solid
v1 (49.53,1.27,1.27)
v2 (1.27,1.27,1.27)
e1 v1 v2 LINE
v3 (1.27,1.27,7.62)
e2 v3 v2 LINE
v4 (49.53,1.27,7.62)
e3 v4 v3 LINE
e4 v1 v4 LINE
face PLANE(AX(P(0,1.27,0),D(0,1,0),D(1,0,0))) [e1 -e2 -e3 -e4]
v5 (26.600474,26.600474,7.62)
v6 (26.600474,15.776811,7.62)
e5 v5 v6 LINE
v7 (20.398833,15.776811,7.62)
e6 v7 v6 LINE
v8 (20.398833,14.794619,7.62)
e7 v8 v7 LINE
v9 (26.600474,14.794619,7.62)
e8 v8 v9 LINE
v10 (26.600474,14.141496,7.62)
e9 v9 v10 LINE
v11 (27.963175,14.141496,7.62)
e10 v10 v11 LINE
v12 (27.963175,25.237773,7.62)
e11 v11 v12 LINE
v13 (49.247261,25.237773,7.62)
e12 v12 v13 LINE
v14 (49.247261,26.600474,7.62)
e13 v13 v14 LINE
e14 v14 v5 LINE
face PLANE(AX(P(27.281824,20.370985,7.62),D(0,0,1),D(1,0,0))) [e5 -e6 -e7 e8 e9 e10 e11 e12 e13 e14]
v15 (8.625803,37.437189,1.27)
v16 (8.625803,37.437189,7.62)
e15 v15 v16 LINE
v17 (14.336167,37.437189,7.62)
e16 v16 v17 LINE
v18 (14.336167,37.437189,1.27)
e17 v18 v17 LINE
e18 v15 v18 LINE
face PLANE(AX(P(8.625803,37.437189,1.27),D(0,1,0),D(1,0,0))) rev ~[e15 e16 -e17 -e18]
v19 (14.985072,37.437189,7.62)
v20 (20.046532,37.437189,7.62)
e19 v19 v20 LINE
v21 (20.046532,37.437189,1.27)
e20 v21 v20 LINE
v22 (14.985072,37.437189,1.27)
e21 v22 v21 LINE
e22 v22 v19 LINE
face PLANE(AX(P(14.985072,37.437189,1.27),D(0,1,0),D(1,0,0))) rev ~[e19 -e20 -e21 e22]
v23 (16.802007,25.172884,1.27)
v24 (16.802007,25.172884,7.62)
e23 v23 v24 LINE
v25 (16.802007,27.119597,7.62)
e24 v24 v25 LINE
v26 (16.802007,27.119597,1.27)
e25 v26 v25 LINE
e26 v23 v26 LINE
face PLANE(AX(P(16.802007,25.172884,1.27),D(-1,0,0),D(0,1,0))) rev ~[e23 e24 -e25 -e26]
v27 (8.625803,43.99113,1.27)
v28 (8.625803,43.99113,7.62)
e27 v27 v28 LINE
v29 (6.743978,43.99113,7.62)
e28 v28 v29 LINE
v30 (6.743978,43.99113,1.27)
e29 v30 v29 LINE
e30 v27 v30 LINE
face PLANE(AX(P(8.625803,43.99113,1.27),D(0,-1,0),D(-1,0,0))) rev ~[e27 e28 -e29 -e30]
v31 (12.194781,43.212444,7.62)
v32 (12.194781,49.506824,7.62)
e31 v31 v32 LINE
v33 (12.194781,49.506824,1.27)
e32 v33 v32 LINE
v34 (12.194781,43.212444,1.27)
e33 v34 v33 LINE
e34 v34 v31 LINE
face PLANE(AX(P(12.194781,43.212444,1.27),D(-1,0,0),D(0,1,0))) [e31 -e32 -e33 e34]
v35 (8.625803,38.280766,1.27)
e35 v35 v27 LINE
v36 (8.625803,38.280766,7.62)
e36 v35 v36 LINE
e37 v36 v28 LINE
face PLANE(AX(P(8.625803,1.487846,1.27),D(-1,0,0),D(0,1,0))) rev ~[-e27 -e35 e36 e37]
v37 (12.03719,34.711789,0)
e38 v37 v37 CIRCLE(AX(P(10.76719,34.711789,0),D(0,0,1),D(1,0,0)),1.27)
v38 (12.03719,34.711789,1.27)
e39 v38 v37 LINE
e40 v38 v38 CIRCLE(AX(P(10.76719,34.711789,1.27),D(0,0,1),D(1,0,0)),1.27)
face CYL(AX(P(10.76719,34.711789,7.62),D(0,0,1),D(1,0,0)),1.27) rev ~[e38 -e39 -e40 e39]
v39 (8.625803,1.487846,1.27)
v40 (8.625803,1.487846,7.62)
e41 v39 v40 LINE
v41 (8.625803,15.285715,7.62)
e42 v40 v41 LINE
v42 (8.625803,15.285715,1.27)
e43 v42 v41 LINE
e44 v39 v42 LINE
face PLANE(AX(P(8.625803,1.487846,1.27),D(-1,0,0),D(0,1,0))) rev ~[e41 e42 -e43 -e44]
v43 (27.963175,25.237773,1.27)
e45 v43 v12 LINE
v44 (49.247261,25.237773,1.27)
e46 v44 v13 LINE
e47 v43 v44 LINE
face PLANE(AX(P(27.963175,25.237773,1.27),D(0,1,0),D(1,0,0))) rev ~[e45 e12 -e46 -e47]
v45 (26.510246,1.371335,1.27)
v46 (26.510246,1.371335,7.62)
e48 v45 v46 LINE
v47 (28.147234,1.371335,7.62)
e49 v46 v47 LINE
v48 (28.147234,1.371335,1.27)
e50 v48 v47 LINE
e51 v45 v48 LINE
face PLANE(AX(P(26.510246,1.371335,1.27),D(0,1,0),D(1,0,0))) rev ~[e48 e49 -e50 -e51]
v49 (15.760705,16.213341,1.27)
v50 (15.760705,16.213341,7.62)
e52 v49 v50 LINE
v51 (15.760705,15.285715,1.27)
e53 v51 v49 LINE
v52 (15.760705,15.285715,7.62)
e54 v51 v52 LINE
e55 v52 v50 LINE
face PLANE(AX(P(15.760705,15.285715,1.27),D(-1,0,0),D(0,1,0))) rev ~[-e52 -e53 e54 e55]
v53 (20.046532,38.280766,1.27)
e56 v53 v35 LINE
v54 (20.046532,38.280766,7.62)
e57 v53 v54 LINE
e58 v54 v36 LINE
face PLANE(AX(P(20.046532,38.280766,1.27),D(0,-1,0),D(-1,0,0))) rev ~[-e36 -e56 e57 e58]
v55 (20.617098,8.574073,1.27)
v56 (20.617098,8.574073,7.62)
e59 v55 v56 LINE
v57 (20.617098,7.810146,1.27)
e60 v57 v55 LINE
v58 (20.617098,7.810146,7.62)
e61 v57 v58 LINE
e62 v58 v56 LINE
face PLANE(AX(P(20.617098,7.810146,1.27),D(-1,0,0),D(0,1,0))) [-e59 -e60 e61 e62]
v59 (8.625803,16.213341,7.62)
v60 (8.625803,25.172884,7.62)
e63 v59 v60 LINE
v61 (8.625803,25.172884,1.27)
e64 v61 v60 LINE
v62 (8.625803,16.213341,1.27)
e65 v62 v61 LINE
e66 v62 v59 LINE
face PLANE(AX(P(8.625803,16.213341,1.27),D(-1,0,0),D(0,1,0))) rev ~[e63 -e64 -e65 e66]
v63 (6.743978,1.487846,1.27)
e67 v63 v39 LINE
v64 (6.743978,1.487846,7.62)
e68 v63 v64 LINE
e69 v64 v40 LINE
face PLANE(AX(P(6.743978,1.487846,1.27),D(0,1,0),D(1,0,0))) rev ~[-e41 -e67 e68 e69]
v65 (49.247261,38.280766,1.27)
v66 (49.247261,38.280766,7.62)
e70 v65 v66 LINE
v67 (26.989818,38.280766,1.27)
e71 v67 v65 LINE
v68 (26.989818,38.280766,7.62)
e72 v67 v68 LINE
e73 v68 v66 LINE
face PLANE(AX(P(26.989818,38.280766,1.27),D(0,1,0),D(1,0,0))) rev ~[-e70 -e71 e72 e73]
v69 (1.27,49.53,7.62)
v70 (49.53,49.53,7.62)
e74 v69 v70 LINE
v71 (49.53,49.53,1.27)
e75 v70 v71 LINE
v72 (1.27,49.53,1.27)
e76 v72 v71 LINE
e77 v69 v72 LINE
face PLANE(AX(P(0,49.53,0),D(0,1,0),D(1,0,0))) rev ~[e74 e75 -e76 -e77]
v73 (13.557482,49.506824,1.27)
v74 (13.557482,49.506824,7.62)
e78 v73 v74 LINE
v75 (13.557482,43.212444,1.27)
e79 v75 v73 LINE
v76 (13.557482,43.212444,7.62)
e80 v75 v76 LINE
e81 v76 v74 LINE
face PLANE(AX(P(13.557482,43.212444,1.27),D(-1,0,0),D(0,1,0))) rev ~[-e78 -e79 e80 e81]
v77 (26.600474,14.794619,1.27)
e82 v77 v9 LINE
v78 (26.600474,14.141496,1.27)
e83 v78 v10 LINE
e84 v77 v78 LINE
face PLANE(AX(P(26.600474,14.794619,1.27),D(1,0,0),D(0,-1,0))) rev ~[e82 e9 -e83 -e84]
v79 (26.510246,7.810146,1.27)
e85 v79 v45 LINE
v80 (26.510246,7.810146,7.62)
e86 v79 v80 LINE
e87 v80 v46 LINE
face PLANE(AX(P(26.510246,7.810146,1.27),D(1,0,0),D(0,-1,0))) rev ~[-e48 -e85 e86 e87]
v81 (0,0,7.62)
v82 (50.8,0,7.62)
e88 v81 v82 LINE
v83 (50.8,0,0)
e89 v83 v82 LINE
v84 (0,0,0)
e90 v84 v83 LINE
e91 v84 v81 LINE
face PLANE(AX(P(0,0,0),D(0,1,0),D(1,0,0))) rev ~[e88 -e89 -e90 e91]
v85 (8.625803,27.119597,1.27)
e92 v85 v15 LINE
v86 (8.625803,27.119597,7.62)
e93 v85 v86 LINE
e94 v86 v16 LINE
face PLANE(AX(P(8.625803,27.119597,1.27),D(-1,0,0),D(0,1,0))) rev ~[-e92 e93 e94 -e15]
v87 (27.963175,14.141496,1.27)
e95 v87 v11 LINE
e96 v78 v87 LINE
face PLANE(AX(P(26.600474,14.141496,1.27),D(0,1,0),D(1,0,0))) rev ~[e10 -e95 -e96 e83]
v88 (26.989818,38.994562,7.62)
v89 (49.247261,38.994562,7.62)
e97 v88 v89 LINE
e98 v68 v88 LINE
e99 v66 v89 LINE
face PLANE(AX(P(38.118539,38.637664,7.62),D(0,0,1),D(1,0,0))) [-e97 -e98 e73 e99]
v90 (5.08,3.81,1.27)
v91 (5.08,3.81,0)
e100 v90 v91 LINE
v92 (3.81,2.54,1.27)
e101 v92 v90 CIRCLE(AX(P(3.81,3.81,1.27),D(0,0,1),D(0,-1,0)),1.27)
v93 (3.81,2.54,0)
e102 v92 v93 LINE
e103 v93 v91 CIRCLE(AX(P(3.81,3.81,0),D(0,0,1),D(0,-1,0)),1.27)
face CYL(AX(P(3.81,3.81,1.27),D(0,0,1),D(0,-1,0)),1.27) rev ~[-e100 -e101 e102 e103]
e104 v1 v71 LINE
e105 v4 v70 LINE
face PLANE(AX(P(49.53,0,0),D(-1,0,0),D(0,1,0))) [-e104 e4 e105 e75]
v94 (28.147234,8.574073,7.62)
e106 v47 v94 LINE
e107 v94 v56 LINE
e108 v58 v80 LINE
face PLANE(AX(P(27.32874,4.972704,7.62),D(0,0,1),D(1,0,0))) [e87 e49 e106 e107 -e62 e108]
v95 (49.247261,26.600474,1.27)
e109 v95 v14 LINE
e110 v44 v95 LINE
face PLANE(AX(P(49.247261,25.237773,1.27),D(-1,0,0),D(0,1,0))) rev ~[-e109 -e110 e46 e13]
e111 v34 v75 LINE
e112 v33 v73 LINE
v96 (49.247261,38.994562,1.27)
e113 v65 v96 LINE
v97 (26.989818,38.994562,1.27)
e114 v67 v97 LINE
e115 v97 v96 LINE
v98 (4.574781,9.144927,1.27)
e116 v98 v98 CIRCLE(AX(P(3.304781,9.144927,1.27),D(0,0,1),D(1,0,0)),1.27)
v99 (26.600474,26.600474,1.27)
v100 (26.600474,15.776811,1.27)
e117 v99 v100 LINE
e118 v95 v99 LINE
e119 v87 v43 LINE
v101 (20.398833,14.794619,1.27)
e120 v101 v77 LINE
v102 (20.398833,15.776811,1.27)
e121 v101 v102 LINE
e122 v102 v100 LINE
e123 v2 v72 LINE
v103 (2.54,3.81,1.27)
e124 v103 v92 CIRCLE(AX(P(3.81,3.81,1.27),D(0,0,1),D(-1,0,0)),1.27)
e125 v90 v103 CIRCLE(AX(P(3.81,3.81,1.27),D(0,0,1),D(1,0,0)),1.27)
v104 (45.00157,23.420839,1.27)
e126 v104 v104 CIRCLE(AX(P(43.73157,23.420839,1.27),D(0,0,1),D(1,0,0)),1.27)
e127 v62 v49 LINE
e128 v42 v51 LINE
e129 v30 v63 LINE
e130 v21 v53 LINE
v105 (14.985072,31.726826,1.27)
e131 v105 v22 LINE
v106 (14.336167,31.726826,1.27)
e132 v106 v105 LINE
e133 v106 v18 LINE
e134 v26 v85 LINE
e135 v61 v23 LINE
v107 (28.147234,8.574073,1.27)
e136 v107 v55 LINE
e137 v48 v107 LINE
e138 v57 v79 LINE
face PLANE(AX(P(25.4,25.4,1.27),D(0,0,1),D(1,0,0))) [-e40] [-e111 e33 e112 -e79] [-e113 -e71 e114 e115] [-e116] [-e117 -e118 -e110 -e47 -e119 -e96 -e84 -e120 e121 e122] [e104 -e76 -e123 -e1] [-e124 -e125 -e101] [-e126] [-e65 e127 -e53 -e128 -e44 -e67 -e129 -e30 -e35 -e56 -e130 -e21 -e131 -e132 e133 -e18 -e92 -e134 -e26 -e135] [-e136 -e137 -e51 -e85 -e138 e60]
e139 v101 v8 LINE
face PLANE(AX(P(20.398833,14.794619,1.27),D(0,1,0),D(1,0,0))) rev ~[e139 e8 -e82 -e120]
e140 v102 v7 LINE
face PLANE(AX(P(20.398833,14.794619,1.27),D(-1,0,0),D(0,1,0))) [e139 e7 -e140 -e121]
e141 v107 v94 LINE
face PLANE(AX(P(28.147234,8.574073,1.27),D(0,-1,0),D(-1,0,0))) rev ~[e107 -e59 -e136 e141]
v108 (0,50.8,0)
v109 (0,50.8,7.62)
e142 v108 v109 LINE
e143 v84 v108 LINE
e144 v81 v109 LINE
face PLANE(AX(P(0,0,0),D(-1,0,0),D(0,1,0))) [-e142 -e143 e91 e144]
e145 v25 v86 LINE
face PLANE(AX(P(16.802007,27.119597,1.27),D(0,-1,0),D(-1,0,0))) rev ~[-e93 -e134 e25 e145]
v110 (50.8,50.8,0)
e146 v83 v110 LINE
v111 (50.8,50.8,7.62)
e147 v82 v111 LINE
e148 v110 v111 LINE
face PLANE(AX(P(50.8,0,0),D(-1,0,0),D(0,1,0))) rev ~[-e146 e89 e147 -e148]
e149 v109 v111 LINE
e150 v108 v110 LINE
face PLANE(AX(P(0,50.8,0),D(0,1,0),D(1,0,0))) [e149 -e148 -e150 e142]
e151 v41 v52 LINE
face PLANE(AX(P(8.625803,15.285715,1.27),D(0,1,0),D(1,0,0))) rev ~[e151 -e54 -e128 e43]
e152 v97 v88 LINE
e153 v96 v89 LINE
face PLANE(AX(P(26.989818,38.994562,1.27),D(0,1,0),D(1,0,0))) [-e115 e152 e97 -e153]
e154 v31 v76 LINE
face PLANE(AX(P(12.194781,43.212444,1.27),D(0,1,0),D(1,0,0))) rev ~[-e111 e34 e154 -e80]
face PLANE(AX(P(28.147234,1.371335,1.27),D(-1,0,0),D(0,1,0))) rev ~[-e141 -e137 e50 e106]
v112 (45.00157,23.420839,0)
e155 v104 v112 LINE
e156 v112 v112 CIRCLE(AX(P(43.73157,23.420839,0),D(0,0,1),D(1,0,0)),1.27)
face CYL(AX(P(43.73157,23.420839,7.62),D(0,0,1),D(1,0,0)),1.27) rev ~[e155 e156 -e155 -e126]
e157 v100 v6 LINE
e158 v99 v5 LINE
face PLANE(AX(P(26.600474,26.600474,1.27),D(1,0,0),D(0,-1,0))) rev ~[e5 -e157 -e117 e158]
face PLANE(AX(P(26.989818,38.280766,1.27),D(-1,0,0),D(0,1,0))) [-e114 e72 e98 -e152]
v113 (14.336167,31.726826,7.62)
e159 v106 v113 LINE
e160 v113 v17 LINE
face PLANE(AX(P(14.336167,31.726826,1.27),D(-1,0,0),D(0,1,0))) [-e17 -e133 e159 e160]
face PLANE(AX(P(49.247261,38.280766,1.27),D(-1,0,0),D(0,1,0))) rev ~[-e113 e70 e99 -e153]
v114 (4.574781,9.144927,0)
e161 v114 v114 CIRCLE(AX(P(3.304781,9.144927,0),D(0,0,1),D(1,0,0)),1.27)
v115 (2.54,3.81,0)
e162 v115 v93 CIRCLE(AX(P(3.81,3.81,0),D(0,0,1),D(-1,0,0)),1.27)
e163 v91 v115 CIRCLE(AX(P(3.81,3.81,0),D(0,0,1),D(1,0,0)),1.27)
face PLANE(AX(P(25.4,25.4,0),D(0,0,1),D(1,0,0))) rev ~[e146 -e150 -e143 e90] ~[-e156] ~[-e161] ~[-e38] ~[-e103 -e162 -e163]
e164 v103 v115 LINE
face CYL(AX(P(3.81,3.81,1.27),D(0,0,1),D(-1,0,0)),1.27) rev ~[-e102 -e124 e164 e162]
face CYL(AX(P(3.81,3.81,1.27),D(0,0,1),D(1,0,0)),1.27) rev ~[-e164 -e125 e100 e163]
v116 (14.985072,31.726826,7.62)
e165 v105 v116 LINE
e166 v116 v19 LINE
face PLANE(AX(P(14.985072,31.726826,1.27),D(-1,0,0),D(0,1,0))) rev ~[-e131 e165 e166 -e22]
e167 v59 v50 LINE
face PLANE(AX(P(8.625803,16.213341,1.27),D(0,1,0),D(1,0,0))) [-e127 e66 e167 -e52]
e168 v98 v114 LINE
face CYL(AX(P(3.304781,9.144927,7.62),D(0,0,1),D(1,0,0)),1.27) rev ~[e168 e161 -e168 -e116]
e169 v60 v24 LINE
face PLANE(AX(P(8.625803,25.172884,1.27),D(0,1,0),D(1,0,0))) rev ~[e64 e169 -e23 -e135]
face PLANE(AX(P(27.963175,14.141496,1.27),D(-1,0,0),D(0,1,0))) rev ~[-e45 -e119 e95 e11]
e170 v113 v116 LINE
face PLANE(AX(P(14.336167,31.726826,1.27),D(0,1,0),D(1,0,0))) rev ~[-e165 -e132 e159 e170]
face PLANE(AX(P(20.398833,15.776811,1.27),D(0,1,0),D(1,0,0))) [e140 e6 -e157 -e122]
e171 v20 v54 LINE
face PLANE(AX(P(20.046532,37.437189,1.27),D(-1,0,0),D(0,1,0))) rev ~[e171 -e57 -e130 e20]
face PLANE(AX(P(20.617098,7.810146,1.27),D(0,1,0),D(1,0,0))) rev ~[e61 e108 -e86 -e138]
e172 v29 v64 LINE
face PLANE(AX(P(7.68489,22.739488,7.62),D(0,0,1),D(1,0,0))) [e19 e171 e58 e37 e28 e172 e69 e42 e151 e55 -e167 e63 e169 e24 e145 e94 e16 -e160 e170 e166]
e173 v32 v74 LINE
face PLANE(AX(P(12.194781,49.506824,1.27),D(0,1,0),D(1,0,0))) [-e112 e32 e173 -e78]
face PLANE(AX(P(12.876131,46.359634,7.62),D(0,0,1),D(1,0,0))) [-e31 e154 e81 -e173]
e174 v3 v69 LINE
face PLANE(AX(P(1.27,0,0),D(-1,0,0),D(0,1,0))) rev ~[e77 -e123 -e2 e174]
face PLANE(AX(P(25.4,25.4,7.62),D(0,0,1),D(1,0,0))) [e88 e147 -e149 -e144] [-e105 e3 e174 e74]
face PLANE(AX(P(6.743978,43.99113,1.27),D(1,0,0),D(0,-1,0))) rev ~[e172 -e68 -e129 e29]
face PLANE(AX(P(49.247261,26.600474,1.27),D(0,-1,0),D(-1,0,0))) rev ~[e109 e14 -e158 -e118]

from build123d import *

# Parameters (mm, degrees)
F0_W      = 50.8
F0_H      = 50.8
F1_DEPTH  = 7.62
F2_T      = -1.27
F4_DEPTH  = 25.4
F5_DEPTH  = 6.35
F6_DEPTH  = 25.4
F8_DEPTH  = 6.35
F7_W      = 7.134902291
F7_H      = 0.9276261553
F7_W_2    = 0.6489050575
F7_H_2    = 5.7103633881
F7_R      = 1.27
F7_W_3    = 1.3627009466
F7_H_3    = 6.2943808734
F7_W_4    = 22.2574435174
F7_H_4    = 0.7137954235
F7_W_5    = 21.2840866297
F7_H_5    = 1.362701878
F7_W_6    = 6.2016416341
F7_H_6    = 0.982192345
F7_W_7    = 5.8931484818
F7_H_7    = 0.7639275864
F9_DEPTH  = 6.35
F10_DEPTH = 25.4
F11_DEPTH = 25.4


# Not quite as in the source:
# - a feature names something its author has since deleted; it is built from what else it names


with BuildPart() as f1:
    # F0 (on Top) → F1 (new body)
    with BuildSketch(Plane.XY):
        with Locations((25.4, 25.4)):
            Rectangle(F0_W, F0_H)
    extrude(amount=F1_DEPTH)

    # F2
    f2_openings = [f1.faces().sort_by_distance(p)[0] for p in [
        (25.4, 25.4, 7.62),
    ]]
    offset(amount=F2_T, openings=f2_openings)

    # F3 (on face) → F4 (cut)
    with BuildSketch(Plane.XY.offset(1.27)):
        with BuildLine():
            ThreePointArc((5.08, 3.81), (3.81, 5.08), (2.54, 3.81))
            Line((2.54, 3.81), (3.81, 3.81))
            Line((3.81, 3.81), (3.81, 2.54))
            ThreePointArc((3.81, 2.54), (4.7080256121, 2.9119743879), (5.08, 3.81))
        make_face()
        with BuildLine():
            Line((3.81, 3.81), (2.54, 3.81))
            ThreePointArc((2.54, 3.81), (2.9119743879, 2.9119743879), (3.81, 2.54))
            Line((3.81, 2.54), (3.81, 3.81))
        make_face()
    extrude(amount=-F4_DEPTH, mode=Mode.SUBTRACT)

    # F3 (on face) → F5 (cut)
    with BuildSketch(Plane.XY.offset(1.27)):
        with BuildLine():
            Line((1.27, 49.53), (1.27, 3.81))
            Line((1.27, 3.81), (2.54, 3.81))
            ThreePointArc((2.54, 3.81), (3.81, 5.08), (5.08, 3.81))
            ThreePointArc((5.08, 3.81), (4.7080256121, 2.9119743879), (3.81, 2.54))
            Line((3.81, 2.54), (3.81, 1.27))
            Line((3.81, 1.27), (49.53, 1.27))
            Line((49.53, 1.27), (49.53, 49.53))
            Line((49.53, 49.53), (1.27, 49.53))
        make_face()
    extrude(amount=F5_DEPTH, mode=Mode.SUBTRACT)

    # F3 (on face) → F6 (cut)
    with BuildSketch(Plane.XY.offset(1.27)):
        with BuildLine():
            ThreePointArc((5.08, 3.81), (3.81, 5.08), (2.54, 3.81))
            Line((2.54, 3.81), (3.81, 3.81))
            Line((3.81, 3.81), (3.81, 2.54))
            ThreePointArc((3.81, 2.54), (4.7080256121, 2.9119743879), (5.08, 3.81))
        make_face()
        with BuildLine():
            Line((3.81, 3.81), (2.54, 3.81))
            ThreePointArc((2.54, 3.81), (2.9119743879, 2.9119743879), (3.81, 2.54))
            Line((3.81, 2.54), (3.81, 3.81))
        make_face()
    extrude(amount=-F6_DEPTH, mode=Mode.SUBTRACT)

    # F7 (on face) → F8 (join)
    with BuildSketch(Plane.XY.offset(1.27)):
        Polygon((6.7439782433, 1.4878462534), (8.625802584, 1.4878462534), (8.625802584, 15.2857145295), (8.625802584, 16.2133406848), (8.625802584, 25.1728836447), (8.625802584, 27.1195974201), (8.625802584, 37.4371893704), (8.625802584, 38.2807664573), (8.625802584, 43.9911298454), (6.7439782433, 43.9911298454), align=None)
    extrude(amount=F8_DEPTH)

    # F7 (on face) → F9 (join)
    with BuildSketch(Plane.XY.offset(1.27)):
        Polygon((6.7439782433, 1.4878462534), (8.625802584, 1.4878462534), (8.625802584, 15.2857145295), (8.625802584, 16.2133406848), (8.625802584, 25.1728836447), (8.625802584, 27.1195974201), (8.625802584, 37.4371893704), (8.625802584, 38.2807664573), (8.625802584, 43.9911298454), (6.7439782433, 43.9911298454), align=None)
        with Locations((12.1932537295, 15.7495276071)):
            Rectangle(F7_W, F7_H)
        Polygon((8.625802584, 27.1195974201), (8.625802584, 25.1728836447), (16.8020073324, 25.1728836447), (16.8020073324, 25.9515698999), (16.8020073324, 27.1195974201), align=None)
        Polygon((20.0465321541, 38.2807664573), (8.625802584, 38.2807664573), (8.625802584, 37.4371893704), (14.336167369, 37.4371893704), (14.9850724265, 37.4371893704), (20.0465321541, 37.4371893704), align=None)
        with Locations((14.6606198978, 34.5820076764)):
            Rectangle(F7_W_2, F7_H_2)
        with Locations((10.7671897858, 34.7117893398)):
            Circle(F7_R)
        with Locations((3.3047813922, 9.144927375)):
            Circle(F7_R)
        with Locations((12.8761311062, 46.3596340269)):
            Rectangle(F7_W_3, F7_H_3)
        with Locations((38.118539378, 38.6376641691)):
            Rectangle(F7_W_4, F7_H_4)
        Polygon((27.963174507, 26.6004744917), (26.6004744917, 26.6004744917), (26.6004744917, 15.7768111676), (26.6004744917, 14.7946188226), (26.6004744917, 14.1414962709), (27.963174507, 14.1414962709), (27.963174507, 25.2377726138), align=None)
        with Locations((38.6052178219, 25.9191235527)):
            Rectangle(F7_W_5, F7_H_5)
        with Locations((23.4996536747, 15.2857149951)):
            Rectangle(F7_W_6, F7_H_6)
        with Locations((43.7315702438, 23.4208386391)):
            Circle(F7_R)
        Polygon((28.1472336501, 8.5740732029), (26.510246098, 8.5740732029), (26.510246098, 7.8101456165), (26.510246098, 1.3713347726), (28.1472336501, 1.3713347726), align=None)
        with Locations((23.5636718571, 8.1921094097)):
            Rectangle(F7_W_7, F7_H_7)
    extrude(amount=F9_DEPTH)

    # F10 (cut): faces of the model
    f10_faces = [f1.faces().sort_by_distance(p)[0] for p in [
        (10.7671897858, 34.7117893398, 7.62),
        (3.3047813922, 9.144927375, 7.62),
    ]]
    extrude(f10_faces, amount=-F10_DEPTH, mode=Mode.SUBTRACT)

    # F11 (cut): a face of the model
    f11_faces = [f1.faces().sort_by_distance(p)[0] for p in [
        (43.7315702438, 23.4208386391, 7.62),
    ]]
    extrude(f11_faces, amount=-F11_DEPTH, mode=Mode.SUBTRACT)


solid = f1.part
